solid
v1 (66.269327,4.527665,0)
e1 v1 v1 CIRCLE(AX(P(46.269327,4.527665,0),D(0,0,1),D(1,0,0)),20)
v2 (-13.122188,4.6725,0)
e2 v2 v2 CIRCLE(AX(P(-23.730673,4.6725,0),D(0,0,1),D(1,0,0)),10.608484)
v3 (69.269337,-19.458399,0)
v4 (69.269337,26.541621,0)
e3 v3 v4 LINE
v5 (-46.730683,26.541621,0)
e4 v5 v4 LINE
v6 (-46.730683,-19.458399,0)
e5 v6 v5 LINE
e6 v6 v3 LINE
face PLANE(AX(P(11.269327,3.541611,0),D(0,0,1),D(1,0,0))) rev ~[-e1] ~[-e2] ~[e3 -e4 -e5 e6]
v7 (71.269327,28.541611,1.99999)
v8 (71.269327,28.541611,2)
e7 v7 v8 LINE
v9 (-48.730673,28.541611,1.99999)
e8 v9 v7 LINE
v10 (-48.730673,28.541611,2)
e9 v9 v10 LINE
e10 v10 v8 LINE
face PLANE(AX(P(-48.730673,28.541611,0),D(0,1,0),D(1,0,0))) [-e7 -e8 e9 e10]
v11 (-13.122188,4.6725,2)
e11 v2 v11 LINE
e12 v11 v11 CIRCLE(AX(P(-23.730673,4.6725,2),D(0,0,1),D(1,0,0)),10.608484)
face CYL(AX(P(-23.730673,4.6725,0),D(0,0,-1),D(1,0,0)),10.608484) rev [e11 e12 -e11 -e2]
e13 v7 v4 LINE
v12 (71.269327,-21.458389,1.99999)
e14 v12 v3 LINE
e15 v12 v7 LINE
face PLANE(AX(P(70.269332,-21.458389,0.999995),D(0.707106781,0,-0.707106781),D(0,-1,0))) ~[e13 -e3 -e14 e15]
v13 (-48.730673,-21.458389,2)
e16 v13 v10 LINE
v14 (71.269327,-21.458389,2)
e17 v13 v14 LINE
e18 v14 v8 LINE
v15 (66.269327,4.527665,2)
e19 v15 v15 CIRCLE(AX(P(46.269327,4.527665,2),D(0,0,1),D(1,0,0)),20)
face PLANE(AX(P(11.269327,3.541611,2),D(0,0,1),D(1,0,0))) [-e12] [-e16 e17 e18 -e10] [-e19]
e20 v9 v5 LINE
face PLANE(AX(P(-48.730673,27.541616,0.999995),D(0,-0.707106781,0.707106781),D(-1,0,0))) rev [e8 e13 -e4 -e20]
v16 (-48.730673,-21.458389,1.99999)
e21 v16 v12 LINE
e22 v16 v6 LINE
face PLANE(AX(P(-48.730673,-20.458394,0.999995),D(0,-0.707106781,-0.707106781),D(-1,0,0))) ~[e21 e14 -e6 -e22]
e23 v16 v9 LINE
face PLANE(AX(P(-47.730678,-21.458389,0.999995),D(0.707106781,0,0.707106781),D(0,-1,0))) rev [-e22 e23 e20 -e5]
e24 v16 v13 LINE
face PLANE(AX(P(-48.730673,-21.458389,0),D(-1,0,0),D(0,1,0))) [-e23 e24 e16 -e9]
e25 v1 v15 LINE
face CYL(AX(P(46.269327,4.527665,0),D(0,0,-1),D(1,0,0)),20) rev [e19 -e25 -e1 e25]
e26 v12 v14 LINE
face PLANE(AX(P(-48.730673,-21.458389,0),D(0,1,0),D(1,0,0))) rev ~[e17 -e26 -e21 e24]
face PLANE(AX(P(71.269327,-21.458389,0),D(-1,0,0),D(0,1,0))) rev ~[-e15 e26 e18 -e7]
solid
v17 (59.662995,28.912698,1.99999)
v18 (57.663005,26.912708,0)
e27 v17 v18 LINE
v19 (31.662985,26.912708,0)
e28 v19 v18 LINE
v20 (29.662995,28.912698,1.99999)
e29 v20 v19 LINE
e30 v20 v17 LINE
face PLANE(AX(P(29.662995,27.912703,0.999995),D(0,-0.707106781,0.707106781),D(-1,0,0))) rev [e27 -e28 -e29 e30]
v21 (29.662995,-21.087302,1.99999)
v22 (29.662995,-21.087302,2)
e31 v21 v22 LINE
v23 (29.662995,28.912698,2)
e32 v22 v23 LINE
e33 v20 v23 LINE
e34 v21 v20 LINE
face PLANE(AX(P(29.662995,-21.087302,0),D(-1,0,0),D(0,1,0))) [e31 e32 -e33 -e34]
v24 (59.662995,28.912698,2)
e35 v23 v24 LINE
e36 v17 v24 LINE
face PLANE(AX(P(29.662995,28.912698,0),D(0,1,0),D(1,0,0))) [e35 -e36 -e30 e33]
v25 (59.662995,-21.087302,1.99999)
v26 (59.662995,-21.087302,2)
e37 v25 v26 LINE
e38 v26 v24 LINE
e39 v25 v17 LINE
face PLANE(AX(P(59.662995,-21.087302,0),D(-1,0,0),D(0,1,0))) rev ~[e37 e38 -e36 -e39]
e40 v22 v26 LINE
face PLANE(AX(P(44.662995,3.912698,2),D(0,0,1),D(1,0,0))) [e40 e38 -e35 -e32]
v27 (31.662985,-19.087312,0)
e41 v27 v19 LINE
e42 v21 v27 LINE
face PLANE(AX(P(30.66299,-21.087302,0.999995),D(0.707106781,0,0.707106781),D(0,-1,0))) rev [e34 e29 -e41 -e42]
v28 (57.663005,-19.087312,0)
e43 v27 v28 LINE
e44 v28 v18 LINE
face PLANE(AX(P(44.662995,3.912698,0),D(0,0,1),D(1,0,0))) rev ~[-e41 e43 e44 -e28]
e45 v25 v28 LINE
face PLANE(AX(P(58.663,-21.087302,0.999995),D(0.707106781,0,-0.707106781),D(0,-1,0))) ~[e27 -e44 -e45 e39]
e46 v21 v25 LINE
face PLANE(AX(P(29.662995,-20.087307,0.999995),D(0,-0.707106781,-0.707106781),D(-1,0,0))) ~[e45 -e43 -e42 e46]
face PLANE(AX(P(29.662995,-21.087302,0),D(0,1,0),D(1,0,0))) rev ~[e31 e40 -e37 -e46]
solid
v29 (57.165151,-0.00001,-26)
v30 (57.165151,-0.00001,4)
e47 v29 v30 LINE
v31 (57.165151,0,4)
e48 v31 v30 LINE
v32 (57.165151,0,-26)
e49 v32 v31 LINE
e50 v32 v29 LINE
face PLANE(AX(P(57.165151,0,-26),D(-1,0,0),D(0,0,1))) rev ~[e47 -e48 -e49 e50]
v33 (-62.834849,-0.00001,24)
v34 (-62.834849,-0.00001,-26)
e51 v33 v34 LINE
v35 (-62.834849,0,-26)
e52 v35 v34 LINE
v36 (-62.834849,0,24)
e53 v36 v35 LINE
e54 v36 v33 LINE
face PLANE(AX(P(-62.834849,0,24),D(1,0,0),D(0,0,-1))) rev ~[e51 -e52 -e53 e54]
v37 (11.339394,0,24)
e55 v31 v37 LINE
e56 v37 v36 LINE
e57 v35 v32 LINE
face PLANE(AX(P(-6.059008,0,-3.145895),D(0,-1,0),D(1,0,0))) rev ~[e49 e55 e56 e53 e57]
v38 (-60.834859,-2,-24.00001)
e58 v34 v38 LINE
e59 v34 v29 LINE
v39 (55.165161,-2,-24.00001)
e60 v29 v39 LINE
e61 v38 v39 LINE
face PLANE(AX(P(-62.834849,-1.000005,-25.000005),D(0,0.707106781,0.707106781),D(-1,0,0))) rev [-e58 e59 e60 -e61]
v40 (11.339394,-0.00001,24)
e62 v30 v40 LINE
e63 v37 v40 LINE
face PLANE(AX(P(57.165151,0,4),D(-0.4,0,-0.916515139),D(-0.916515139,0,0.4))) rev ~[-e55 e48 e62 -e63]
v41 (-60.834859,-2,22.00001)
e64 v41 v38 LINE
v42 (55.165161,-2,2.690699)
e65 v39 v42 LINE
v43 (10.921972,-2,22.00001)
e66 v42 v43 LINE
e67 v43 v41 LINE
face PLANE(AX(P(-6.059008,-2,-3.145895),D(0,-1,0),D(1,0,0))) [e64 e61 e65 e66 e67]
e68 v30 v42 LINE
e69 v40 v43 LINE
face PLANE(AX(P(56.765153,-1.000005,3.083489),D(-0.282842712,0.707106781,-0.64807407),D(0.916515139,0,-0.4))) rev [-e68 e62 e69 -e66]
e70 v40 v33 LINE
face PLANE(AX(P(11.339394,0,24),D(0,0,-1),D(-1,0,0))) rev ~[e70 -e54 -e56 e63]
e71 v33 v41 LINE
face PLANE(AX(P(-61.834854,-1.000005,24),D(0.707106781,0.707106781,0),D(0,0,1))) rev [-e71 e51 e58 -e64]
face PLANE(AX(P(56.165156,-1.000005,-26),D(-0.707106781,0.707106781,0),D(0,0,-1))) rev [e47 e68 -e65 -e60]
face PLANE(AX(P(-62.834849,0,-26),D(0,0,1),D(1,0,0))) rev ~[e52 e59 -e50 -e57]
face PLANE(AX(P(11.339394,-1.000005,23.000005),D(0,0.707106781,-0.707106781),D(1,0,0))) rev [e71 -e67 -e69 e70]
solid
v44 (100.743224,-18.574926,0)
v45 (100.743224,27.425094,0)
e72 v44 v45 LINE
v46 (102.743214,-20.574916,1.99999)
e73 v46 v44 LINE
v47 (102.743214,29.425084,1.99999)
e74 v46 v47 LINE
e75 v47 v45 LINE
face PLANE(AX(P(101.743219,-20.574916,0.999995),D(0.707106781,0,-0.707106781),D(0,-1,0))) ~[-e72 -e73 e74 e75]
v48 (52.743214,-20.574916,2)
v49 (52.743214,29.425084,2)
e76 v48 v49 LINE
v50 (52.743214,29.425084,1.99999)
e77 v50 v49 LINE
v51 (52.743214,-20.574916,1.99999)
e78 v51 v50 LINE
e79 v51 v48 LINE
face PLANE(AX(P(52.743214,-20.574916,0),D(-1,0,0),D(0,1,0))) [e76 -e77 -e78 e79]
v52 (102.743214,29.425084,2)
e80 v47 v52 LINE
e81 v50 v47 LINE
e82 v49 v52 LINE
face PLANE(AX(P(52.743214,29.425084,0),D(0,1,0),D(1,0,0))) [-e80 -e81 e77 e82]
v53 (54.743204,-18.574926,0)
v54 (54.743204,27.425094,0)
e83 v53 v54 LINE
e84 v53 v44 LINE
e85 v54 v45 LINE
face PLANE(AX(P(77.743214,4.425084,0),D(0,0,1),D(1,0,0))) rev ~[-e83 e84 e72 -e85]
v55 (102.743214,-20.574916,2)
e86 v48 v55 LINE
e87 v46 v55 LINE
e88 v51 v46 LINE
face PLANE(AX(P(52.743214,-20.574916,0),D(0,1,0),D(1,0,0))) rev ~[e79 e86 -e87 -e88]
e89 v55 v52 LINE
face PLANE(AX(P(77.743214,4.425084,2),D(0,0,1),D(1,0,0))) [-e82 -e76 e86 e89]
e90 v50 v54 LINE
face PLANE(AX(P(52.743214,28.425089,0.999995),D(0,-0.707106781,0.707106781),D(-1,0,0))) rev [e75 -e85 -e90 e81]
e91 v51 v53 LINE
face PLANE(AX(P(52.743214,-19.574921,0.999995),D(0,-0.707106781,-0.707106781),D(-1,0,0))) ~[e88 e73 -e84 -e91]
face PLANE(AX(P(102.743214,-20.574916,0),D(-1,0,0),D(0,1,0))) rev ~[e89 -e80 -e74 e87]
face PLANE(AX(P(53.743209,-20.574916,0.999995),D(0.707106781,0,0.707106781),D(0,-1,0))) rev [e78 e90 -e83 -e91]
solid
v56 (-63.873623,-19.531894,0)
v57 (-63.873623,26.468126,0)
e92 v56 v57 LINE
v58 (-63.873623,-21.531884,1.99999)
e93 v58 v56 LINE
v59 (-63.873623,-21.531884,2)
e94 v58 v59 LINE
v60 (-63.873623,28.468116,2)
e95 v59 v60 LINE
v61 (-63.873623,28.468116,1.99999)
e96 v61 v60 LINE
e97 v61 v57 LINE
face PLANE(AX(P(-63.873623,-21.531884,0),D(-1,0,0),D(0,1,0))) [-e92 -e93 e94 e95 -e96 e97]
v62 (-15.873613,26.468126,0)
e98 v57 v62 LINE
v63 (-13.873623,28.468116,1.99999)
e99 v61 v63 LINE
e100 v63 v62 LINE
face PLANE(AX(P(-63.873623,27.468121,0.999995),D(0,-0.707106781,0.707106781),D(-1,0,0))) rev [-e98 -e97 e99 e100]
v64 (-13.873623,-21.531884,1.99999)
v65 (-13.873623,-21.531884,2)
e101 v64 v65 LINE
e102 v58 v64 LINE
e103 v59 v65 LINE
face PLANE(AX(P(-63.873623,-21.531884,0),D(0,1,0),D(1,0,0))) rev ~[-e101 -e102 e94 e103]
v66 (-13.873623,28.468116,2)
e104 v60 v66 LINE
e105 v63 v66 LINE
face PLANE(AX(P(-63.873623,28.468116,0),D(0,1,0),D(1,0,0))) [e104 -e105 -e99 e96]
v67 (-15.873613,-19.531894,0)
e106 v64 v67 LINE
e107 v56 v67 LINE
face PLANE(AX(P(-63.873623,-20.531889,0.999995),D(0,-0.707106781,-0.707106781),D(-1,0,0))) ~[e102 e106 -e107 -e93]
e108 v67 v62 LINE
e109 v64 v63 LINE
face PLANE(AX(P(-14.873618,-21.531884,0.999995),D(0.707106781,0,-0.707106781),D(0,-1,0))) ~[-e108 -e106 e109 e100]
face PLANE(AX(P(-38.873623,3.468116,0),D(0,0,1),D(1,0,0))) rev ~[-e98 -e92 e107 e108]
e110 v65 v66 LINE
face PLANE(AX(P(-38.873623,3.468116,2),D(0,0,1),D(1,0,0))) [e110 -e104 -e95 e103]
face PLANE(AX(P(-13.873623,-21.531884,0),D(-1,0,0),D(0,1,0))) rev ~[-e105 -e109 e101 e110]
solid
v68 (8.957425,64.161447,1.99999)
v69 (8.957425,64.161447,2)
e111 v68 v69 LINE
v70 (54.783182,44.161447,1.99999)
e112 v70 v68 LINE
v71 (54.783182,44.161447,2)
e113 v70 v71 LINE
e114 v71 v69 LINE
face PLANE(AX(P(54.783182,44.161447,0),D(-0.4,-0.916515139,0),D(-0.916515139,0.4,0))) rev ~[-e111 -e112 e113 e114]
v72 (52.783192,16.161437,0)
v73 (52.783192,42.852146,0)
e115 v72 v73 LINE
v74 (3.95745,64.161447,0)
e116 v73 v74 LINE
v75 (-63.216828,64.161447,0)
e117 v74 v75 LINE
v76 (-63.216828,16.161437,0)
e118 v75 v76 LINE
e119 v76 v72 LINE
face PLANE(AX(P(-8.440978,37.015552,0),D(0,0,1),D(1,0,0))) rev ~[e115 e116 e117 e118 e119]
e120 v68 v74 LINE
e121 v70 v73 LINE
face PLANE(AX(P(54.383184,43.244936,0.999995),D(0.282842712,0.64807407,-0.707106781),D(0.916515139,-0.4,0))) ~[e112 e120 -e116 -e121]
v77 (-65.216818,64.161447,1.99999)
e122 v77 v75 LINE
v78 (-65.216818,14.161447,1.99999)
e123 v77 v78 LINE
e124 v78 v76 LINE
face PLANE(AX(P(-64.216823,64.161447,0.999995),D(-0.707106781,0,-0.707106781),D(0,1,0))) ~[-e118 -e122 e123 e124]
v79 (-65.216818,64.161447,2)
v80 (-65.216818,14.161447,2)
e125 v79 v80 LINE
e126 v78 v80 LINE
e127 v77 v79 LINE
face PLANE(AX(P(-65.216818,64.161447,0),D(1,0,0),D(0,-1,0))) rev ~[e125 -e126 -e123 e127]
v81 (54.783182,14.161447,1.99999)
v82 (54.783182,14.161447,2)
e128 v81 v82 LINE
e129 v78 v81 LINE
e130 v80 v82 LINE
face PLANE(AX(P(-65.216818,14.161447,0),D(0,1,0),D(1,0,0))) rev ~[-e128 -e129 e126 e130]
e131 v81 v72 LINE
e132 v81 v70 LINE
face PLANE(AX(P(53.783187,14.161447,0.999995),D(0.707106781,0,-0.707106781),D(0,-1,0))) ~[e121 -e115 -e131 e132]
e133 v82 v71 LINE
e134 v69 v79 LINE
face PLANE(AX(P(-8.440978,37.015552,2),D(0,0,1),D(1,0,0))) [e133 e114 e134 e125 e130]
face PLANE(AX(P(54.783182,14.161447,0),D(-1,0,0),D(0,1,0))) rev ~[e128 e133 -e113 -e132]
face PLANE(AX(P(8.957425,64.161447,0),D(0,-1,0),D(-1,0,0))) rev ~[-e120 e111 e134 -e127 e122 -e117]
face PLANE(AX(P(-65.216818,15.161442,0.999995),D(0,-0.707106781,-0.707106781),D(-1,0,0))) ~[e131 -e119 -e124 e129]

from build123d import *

# Parameters (mm, degrees)
F0_W      = 120
F0_H      = 50
F0_R      = 10.6084843686
F0_R_2    = 20
F1_DEPTH  = 2
F2_W      = 50
F2_H      = 50
F3_DEPTH  = 2
F4_W      = 30
F4_H      = 50
F5_DEPTH  = 2
F6_W      = 50
F6_H      = 50
F7_DEPTH  = 2
F9_DEPTH  = 2
F11_DEPTH = 2
F12_SIZE  = 1.99999
F13_SIZE  = 1.99999
F14_SIZE  = 1.99999
F15_SIZE  = 1.99999
F16_SIZE  = 1.99999
F17_SIZE  = 1.99999


# Not quite as in the source:
# - a fillet or chamfer is up to 0.001 mm smaller than in the source, because OpenCascade refuses the exact size


with BuildPart() as f1:
    # F0 (on Top) → F1 (new body)
    with BuildSketch(Plane.XY):
        with Locations((11.2693273971, 3.541611135)):
            Rectangle(F0_W, F0_H)
        with Locations((-23.7306726029, 4.672499537)):
            Circle(F0_R, mode=Mode.SUBTRACT)
        with Locations((46.2693273971, 4.5276646413)):
            Circle(F0_R_2, mode=Mode.SUBTRACT)
    extrude(amount=F1_DEPTH)

    # F12 (size 2 in the source; OpenCascade refuses exactly that, so slightly less here)
    f12_edges = [f1.edges().sort_by_distance(p)[0] for p in [
        (71.269327, 3.541611, 0),
        (11.269327, 28.541611, 0),
        (-48.730673, 3.541611, 0),
        (11.269327, -21.458389, 0),
    ]]
    chamfer(f12_edges, length=F12_SIZE)


with BuildPart() as f3:
    # F2 (on Top) → F3 (new body)
    with BuildSketch(Plane.XY):
        with Locations((-38.8736227571, 3.468115814)):
            Rectangle(F2_W, F2_H)
    extrude(amount=F3_DEPTH)

    # F13 (size 2 in the source; OpenCascade refuses exactly that, so slightly less here)
    f13_edges = [f3.edges().sort_by_distance(p)[0] for p in [
        (-38.873623, -21.531884, 0),
        (-13.873623, 3.468116, 0),
        (-38.873623, 28.468116, 0),
    ]]
    chamfer(f13_edges, length=F13_SIZE)


with BuildPart() as f5:
    # F4 (on Top) → F5 (new body)
    with BuildSketch(Plane.XY):
        with Locations((44.6629953704, 3.9126975462)):
            Rectangle(F4_W, F4_H)
    extrude(amount=F5_DEPTH)

    # F14 (size 2 in the source; OpenCascade refuses exactly that, so slightly less here)
    f14_edges = [f5.edges().sort_by_distance(p)[0] for p in [
        (44.662995, -21.087302, 0),
        (29.662995, 3.912698, 0),
        (44.662995, 28.912698, 0),
        (59.662995, 3.912698, 0),
    ]]
    chamfer(f14_edges, length=F14_SIZE)


with BuildPart() as f7:
    # F6 (on Top) → F7 (new body)
    with BuildSketch(Plane.XY):
        with Locations((77.7432139613, 4.4250842184)):
            Rectangle(F6_W, F6_H)
    extrude(amount=F7_DEPTH)

    # F15 (size 2 in the source; OpenCascade refuses exactly that, so slightly less here)
    f15_edges = [f7.edges().sort_by_distance(p)[0] for p in [
        (77.743214, -20.574916, 0),
        (52.743214, 4.425084, 0),
        (77.743214, 29.425084, 0),
        (102.743214, 4.425084, 0),
    ]]
    chamfer(f15_edges, length=F15_SIZE)


with BuildPart() as f9:
    # F8 (on Top) → F9 (new body)
    with BuildSketch(Plane.XY):
        Polygon((-65.216818493, 64.1614470469), (-65.216818493, 14.1614470469), (54.783181507, 14.1614470469), (54.783181507, 44.1614470469), (8.9574245575, 64.1614470469), align=None)
    extrude(amount=F9_DEPTH)

    # F16 (size 2 in the source; OpenCascade refuses exactly that, so slightly less here)
    f16_edges = [f9.edges().sort_by_distance(p)[0] for p in [
        (-5.216818, 14.161447, 0),
        (-65.216818, 39.161447, 0),
        (54.783182, 29.161447, 0),
        (31.870303, 54.161447, 0),
    ]]
    chamfer(f16_edges, length=F16_SIZE)


with BuildPart() as f11:
    # F10 (on Front) → F11 (new body)
    with BuildSketch(Plane.XZ):
        Polygon((-62.8348486101, 24), (-62.8348486101, -26), (57.1651513899, -26), (57.1651513899, 4), (11.3393944404, 24), align=None)
    extrude(amount=F11_DEPTH)

    # F17 (size 2 in the source; OpenCascade refuses exactly that, so slightly less here)
    f17_edges = [f11.edges().sort_by_distance(p)[0] for p in [
        (34.252273, -2, 14),
        (-25.747727, -2, 24),
        (-62.834849, -2, -1),
        (57.165151, -2, -11),
        (-2.834849, -2, -26),
    ]]
    chamfer(f17_edges, length=F17_SIZE)


solid = Compound([f1.part, f3.part, f5.part, f7.part, f9.part, f11.part])
